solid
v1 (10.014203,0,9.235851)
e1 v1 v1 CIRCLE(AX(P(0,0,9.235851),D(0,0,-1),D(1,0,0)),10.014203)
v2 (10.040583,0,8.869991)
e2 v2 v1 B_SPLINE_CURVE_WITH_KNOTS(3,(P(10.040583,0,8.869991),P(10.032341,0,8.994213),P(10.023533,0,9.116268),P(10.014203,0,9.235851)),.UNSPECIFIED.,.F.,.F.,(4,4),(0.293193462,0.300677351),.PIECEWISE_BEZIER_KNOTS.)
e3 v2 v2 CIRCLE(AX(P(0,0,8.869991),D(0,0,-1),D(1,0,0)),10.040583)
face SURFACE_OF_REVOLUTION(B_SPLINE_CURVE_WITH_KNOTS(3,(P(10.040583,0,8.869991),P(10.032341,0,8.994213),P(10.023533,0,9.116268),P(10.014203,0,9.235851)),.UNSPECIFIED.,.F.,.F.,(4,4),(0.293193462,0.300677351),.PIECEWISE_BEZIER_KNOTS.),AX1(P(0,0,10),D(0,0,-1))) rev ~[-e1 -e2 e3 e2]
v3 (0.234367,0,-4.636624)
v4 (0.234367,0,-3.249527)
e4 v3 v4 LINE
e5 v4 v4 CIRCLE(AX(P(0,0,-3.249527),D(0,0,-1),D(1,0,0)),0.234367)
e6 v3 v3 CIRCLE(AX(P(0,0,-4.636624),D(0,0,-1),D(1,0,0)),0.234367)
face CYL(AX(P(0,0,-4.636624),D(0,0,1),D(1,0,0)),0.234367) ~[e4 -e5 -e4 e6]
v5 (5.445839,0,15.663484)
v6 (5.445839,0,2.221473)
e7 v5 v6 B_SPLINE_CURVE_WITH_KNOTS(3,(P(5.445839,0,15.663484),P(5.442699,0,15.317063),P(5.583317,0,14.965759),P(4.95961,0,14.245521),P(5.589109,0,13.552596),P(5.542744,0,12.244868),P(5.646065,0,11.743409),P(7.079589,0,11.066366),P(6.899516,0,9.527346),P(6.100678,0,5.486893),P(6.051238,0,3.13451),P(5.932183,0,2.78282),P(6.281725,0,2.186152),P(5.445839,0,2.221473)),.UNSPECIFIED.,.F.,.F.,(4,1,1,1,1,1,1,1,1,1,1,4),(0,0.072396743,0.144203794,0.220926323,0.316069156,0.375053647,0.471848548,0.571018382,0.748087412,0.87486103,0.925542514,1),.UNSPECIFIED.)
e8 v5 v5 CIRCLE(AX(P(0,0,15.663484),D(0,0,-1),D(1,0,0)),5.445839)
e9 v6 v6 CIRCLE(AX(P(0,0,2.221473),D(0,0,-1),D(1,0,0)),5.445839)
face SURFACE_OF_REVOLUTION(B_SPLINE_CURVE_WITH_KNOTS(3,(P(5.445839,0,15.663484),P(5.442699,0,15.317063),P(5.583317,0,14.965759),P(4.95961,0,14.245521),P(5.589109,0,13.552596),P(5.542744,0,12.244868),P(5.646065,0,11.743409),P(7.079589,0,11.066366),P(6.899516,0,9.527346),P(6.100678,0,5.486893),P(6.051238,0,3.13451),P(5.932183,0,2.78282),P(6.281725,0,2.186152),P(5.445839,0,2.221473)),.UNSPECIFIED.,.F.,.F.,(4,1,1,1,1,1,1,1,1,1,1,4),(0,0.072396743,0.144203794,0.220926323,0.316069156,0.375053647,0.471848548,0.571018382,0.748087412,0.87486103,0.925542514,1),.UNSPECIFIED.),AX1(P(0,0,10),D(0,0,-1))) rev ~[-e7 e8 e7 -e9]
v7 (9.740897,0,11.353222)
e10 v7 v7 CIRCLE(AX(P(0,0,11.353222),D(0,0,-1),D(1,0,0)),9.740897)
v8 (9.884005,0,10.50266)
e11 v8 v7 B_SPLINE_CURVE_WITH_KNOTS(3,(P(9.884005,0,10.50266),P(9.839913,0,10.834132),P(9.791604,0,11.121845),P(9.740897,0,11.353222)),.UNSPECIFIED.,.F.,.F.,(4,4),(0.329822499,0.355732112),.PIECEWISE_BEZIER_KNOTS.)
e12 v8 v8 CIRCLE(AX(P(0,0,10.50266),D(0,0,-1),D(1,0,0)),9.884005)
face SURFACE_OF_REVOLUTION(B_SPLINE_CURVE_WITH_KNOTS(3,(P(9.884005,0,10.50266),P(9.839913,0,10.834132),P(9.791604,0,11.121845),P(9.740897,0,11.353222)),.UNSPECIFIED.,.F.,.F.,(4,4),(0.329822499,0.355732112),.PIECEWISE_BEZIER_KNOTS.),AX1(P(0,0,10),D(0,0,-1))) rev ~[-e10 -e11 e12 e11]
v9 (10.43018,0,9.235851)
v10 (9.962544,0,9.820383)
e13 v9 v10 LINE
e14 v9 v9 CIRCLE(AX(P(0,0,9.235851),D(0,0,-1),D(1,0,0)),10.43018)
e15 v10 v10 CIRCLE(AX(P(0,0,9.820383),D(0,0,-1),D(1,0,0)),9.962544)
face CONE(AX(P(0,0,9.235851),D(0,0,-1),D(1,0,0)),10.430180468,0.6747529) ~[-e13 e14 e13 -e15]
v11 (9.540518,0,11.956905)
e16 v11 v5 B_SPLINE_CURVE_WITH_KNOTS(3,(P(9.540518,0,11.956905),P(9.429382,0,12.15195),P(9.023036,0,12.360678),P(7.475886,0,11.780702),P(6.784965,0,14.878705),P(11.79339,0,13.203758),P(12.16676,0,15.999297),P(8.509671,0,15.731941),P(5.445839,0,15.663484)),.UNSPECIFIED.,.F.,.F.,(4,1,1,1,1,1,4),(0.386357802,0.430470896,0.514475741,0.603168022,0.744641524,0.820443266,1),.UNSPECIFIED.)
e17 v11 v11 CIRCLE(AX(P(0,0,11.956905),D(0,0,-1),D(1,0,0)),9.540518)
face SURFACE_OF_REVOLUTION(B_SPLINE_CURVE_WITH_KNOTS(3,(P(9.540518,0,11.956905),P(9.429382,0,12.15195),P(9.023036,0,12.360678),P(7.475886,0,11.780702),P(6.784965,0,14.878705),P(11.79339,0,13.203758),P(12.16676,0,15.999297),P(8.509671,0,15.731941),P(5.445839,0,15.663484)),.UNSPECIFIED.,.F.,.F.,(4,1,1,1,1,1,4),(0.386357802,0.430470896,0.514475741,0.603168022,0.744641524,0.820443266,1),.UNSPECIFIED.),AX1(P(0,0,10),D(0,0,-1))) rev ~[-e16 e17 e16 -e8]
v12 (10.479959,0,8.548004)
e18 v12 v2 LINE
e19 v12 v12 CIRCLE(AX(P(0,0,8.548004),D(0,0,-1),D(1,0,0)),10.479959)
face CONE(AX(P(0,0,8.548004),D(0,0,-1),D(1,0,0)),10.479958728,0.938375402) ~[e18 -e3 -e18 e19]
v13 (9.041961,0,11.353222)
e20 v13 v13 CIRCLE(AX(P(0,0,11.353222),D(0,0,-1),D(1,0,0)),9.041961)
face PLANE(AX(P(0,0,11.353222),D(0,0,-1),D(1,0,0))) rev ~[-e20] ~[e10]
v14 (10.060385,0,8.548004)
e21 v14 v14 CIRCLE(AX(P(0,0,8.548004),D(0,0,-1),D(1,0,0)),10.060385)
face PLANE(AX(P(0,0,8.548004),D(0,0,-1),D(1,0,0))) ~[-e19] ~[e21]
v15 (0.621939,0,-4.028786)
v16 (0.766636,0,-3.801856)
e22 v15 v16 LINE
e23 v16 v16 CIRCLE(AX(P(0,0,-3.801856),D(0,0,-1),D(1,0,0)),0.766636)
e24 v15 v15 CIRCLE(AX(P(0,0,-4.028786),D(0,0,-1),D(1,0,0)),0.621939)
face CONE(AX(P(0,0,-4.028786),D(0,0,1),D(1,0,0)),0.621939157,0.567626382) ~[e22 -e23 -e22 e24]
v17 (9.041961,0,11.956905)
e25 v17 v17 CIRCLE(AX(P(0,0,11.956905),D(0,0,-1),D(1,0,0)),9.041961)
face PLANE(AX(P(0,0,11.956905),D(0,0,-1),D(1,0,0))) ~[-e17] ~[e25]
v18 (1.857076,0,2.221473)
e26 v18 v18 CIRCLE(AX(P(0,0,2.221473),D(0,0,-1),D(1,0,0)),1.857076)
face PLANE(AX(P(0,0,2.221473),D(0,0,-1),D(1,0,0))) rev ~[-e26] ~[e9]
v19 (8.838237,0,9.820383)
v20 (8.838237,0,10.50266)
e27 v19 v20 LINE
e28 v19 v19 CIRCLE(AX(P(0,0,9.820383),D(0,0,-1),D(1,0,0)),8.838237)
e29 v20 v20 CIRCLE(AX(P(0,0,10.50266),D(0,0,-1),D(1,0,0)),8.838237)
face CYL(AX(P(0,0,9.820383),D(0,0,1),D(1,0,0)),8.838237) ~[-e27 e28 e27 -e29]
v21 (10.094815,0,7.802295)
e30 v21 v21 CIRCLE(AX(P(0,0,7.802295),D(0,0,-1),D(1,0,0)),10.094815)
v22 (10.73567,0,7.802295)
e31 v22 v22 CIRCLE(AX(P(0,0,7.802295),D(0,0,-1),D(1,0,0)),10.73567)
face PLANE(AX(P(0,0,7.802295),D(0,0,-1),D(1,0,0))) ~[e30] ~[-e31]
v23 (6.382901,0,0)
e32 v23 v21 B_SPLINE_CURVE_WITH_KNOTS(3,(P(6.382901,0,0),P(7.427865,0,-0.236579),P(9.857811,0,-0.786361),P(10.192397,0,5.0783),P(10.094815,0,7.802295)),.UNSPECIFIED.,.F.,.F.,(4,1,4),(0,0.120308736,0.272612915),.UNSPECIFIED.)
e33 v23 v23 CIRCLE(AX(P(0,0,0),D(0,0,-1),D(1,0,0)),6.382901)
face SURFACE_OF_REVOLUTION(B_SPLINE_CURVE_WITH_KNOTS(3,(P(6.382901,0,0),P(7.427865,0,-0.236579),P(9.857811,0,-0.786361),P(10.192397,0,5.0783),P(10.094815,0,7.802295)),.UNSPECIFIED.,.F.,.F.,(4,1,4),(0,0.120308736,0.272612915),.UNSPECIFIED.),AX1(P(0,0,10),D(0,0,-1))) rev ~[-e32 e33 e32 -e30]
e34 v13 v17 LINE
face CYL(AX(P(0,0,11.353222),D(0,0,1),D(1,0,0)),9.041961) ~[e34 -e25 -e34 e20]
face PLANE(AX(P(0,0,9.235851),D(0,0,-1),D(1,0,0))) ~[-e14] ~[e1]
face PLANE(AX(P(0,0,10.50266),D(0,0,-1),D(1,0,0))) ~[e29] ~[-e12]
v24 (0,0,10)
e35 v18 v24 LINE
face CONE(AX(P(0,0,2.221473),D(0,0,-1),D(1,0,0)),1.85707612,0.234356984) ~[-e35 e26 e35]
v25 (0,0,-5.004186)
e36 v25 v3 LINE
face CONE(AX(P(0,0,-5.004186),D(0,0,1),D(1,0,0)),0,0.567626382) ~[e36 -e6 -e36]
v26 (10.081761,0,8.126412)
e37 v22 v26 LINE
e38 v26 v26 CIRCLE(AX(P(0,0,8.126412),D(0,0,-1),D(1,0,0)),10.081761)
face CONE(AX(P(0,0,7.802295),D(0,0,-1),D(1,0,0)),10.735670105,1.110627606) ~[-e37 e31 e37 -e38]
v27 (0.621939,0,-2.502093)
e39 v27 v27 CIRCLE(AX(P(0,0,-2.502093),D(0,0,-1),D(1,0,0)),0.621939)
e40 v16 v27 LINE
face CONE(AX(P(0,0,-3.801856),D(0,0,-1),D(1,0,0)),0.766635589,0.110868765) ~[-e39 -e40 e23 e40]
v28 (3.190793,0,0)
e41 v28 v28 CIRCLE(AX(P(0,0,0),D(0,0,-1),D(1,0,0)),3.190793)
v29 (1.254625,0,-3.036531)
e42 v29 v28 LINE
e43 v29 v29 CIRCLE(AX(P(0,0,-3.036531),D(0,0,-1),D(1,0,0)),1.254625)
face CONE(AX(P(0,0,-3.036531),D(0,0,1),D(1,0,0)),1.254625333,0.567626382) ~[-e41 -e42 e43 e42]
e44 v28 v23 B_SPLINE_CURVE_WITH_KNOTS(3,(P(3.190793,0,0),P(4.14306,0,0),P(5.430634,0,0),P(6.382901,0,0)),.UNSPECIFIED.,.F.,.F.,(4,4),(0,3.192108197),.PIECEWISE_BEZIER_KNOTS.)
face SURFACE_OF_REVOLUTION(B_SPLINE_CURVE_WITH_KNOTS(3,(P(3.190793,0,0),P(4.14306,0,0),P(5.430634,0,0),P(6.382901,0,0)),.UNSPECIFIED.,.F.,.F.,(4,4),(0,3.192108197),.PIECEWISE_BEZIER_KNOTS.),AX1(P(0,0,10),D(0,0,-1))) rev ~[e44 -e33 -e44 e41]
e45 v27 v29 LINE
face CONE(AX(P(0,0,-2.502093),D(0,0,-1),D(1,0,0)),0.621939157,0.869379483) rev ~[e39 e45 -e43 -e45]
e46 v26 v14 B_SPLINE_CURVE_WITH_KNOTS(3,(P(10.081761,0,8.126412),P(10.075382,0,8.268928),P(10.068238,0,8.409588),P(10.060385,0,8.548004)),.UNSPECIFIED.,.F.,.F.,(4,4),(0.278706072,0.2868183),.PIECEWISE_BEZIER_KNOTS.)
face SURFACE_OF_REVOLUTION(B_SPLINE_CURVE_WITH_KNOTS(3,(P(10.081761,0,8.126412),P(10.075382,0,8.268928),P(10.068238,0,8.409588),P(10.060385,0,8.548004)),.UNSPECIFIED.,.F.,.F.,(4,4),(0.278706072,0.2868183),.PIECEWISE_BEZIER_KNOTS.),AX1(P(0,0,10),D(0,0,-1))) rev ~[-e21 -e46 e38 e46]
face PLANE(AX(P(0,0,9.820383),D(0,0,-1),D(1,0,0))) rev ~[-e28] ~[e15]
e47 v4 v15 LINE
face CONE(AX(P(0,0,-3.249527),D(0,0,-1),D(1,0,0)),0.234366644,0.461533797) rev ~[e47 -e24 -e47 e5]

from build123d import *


# Not quite as in the source:
# - a feature names something its author has since deleted; it is built from what else it names


with BuildPart() as f1:
    # F0 (on Front) → F1 (revolve)
    with BuildSketch(Plane.XZ):
        with BuildLine():
            add(Edge.make_bspline(
                [(5.4458385124, 15.6634841114), (5.4426992502, 15.3170629144), (5.5833172951, 14.9657589831), (4.9596099598, 14.245520909), (5.589108727, 13.552596485), (5.5427438151, 12.2448683469), (5.6460651453, 11.7434094436), (7.0795890557, 11.0663661868), (6.8995157368, 9.5273460061), (6.1006779938, 5.4868925152), (6.051238002, 3.1345104864), (5.932182655, 2.7828202265), (6.2817245892, 2.1861518437), (5.4458385124, 2.221473027)],
                knots=[0, 0, 0, 0, 0.072396743, 0.1442037942, 0.2209263229, 0.3160691563, 0.3750536466, 0.4718485484, 0.5710183822, 0.748087412, 0.87486103, 0.9255425144, 1, 1, 1, 1], degree=3))
            Line((5.4458385124, 2.221473027), (1.8570761203, 2.221473027))
            Line((1.8570761203, 2.221473027), (0, 10))
            Line((0, 10), (0, 2.221473027))
            Line((0, 2.221473027), (0, 0))
            Line((0, 0), (0, -5.0041857176))
            Line((0, -5.0041857176), (0.2343666443, -4.636623742))
            Line((0.2343666443, -4.636623742), (0.2343666443, -3.249527188))
            Line((0.2343666443, -3.249527188), (0.621939157, -4.0287858868))
            Line((0.621939157, -4.0287858868), (0.7666355889, -3.8018555294))
            Line((0.7666355889, -3.8018555294), (0.621939157, -2.5020928588))
            Line((0.621939157, -2.5020928588), (1.2546253335, -3.0365312868))
            Line((1.2546253335, -3.0365312868), (3.190793097, 0))
            add(Edge.make_bspline(
                [(3.190793097, 0), (4.1430603402, 0), (5.4306340505, 0), (6.3829012937, 0)],
                knots=[0, 0, 0, 0, 3.1921081967, 3.1921081967, 3.1921081967, 3.1921081967], degree=3))
            add(Edge.make_bspline(
                [(6.3829012937, 0), (7.4278653987, -0.23657947), (9.8578113438, -0.7863606467), (10.1923974106, 5.0783004491), (10.0948148285, 7.8022954985)],
                knots=[0, 0, 0, 0, 0.1203087356, 0.2726129152, 0.2726129152, 0.2726129152, 0.2726129152], degree=3))
            add(Edge.make_bspline(
                [(10.0948148285, 7.8022954985), (10.0909108914, 7.9112729922), (10.0865515904, 8.0193662132), (10.0817605853, 8.126411587)],
                knots=[0.2726129152, 0.2726129152, 0.2726129152, 0.2726129152, 0.2787060716, 0.2787060716, 0.2787060716, 0.2787060716], degree=3))
            add(Edge.make_bspline(
                [(10.0817605853, 8.126411587), (10.0753819982, 8.2689282881), (10.0682381992, 8.4095876395), (10.0603850232, 8.5480036214)],
                knots=[0.2787060716, 0.2787060716, 0.2787060716, 0.2787060716, 0.2868183002, 0.2868183002, 0.2868183002, 0.2868183002], degree=3))
            add(Edge.make_bspline(
                [(10.0603850232, 8.5480036214), (10.0542134435, 8.6567806661), (10.047603758, 8.7641722227), (10.0405830661, 8.8699909372)],
                knots=[0.2868183002, 0.2868183002, 0.2868183002, 0.2868183002, 0.2931934618, 0.2931934618, 0.2931934618, 0.2931934618], degree=3))
            add(Edge.make_bspline(
                [(10.0405830661, 8.8699909372), (10.0323413803, 8.9942129683), (10.0235332977, 9.116267508), (10.0142026582, 9.2358514667)],
                knots=[0.2931934618, 0.2931934618, 0.2931934618, 0.2931934618, 0.3006773509, 0.3006773509, 0.3006773509, 0.3006773509], degree=3))
            add(Edge.make_bspline(
                [(10.0142026582, 9.2358514667), (9.998409287, 9.4382635131), (9.9811187828, 9.6335973083), (9.9625437439, 9.8203830421)],
                knots=[0.3006773509, 0.3006773509, 0.3006773509, 0.3006773509, 0.3133448468, 0.3133448468, 0.3133448468, 0.3133448468], degree=3))
            Line((9.9625437439, 9.8203830421), (8.8382373747, 9.8203830421))
            Line((8.8382373747, 9.8203830421), (8.8382373747, 10.5026598325))
            Line((8.8382373747, 10.5026598325), (9.8840050008, 10.5026598325))
            add(Edge.make_bspline(
                [(9.8840050008, 10.5026598325), (9.8399129011, 10.8341320589), (9.7916038683, 11.1218449708), (9.7408970609, 11.3532217219)],
                knots=[0.3298224991, 0.3298224991, 0.3298224991, 0.3298224991, 0.3557321119, 0.3557321119, 0.3557321119, 0.3557321119], degree=3))
            Line((9.7408970609, 11.3532217219), (9.0419609572, 11.3532217219))
            Line((9.0419609572, 11.3532217219), (9.0419609572, 11.9569053175))
            Line((9.0419609572, 11.9569053175), (9.5405176931, 11.9569053175))
            add(Edge.make_bspline(
                [(9.5405176931, 11.9569053175), (9.4293821341, 12.1519504238), (9.0230360003, 12.3606776001), (7.4758860135, 11.7807017496), (6.7849650417, 14.8787052356), (11.7933896772, 13.2037578467), (12.1667597112, 15.9992973155), (8.5096708179, 15.7319407269), (5.4458385124, 15.6634841114)],
                knots=[0.3863578023, 0.3863578023, 0.3863578023, 0.3863578023, 0.4304708956, 0.5144757413, 0.6031680217, 0.7446415244, 0.8204432659, 1, 1, 1, 1], degree=3))
        make_face()
        with BuildLine():
            Line((10.4301804677, 9.2358514667), (9.9625437439, 9.8203830421))
            add(Edge.make_bspline(
                [(10.0142026582, 9.2358514667), (9.998409287, 9.4382635131), (9.9811187828, 9.6335973083), (9.9625437439, 9.8203830421)],
                knots=[0.3006773509, 0.3006773509, 0.3006773509, 0.3006773509, 0.3133448468, 0.3133448468, 0.3133448468, 0.3133448468], degree=3))
            Line((10.0142026582, 9.2358514667), (10.4301804677, 9.2358514667))
        make_face()
        with BuildLine():
            Line((10.479958728, 8.5480036214), (10.0405830661, 8.8699909372))
            add(Edge.make_bspline(
                [(10.0603850232, 8.5480036214), (10.0542134435, 8.6567806661), (10.047603758, 8.7641722227), (10.0405830661, 8.8699909372)],
                knots=[0.2868183002, 0.2868183002, 0.2868183002, 0.2868183002, 0.2931934618, 0.2931934618, 0.2931934618, 0.2931934618], degree=3))
            Line((10.0603850232, 8.5480036214), (10.479958728, 8.5480036214))
        make_face()
        with BuildLine():
            Line((10.7356701046, 7.8022954985), (10.0817605853, 8.126411587))
            add(Edge.make_bspline(
                [(10.0948148285, 7.8022954985), (10.0909108914, 7.9112729922), (10.0865515904, 8.0193662132), (10.0817605853, 8.126411587)],
                knots=[0.2726129152, 0.2726129152, 0.2726129152, 0.2726129152, 0.2787060716, 0.2787060716, 0.2787060716, 0.2787060716], degree=3))
            Line((10.0948148285, 7.8022954985), (10.7356701046, 7.8022954985))
        make_face()
    revolve(axis=Axis((0, 0, 10), (0, 0, -1)))


solid = f1.part
